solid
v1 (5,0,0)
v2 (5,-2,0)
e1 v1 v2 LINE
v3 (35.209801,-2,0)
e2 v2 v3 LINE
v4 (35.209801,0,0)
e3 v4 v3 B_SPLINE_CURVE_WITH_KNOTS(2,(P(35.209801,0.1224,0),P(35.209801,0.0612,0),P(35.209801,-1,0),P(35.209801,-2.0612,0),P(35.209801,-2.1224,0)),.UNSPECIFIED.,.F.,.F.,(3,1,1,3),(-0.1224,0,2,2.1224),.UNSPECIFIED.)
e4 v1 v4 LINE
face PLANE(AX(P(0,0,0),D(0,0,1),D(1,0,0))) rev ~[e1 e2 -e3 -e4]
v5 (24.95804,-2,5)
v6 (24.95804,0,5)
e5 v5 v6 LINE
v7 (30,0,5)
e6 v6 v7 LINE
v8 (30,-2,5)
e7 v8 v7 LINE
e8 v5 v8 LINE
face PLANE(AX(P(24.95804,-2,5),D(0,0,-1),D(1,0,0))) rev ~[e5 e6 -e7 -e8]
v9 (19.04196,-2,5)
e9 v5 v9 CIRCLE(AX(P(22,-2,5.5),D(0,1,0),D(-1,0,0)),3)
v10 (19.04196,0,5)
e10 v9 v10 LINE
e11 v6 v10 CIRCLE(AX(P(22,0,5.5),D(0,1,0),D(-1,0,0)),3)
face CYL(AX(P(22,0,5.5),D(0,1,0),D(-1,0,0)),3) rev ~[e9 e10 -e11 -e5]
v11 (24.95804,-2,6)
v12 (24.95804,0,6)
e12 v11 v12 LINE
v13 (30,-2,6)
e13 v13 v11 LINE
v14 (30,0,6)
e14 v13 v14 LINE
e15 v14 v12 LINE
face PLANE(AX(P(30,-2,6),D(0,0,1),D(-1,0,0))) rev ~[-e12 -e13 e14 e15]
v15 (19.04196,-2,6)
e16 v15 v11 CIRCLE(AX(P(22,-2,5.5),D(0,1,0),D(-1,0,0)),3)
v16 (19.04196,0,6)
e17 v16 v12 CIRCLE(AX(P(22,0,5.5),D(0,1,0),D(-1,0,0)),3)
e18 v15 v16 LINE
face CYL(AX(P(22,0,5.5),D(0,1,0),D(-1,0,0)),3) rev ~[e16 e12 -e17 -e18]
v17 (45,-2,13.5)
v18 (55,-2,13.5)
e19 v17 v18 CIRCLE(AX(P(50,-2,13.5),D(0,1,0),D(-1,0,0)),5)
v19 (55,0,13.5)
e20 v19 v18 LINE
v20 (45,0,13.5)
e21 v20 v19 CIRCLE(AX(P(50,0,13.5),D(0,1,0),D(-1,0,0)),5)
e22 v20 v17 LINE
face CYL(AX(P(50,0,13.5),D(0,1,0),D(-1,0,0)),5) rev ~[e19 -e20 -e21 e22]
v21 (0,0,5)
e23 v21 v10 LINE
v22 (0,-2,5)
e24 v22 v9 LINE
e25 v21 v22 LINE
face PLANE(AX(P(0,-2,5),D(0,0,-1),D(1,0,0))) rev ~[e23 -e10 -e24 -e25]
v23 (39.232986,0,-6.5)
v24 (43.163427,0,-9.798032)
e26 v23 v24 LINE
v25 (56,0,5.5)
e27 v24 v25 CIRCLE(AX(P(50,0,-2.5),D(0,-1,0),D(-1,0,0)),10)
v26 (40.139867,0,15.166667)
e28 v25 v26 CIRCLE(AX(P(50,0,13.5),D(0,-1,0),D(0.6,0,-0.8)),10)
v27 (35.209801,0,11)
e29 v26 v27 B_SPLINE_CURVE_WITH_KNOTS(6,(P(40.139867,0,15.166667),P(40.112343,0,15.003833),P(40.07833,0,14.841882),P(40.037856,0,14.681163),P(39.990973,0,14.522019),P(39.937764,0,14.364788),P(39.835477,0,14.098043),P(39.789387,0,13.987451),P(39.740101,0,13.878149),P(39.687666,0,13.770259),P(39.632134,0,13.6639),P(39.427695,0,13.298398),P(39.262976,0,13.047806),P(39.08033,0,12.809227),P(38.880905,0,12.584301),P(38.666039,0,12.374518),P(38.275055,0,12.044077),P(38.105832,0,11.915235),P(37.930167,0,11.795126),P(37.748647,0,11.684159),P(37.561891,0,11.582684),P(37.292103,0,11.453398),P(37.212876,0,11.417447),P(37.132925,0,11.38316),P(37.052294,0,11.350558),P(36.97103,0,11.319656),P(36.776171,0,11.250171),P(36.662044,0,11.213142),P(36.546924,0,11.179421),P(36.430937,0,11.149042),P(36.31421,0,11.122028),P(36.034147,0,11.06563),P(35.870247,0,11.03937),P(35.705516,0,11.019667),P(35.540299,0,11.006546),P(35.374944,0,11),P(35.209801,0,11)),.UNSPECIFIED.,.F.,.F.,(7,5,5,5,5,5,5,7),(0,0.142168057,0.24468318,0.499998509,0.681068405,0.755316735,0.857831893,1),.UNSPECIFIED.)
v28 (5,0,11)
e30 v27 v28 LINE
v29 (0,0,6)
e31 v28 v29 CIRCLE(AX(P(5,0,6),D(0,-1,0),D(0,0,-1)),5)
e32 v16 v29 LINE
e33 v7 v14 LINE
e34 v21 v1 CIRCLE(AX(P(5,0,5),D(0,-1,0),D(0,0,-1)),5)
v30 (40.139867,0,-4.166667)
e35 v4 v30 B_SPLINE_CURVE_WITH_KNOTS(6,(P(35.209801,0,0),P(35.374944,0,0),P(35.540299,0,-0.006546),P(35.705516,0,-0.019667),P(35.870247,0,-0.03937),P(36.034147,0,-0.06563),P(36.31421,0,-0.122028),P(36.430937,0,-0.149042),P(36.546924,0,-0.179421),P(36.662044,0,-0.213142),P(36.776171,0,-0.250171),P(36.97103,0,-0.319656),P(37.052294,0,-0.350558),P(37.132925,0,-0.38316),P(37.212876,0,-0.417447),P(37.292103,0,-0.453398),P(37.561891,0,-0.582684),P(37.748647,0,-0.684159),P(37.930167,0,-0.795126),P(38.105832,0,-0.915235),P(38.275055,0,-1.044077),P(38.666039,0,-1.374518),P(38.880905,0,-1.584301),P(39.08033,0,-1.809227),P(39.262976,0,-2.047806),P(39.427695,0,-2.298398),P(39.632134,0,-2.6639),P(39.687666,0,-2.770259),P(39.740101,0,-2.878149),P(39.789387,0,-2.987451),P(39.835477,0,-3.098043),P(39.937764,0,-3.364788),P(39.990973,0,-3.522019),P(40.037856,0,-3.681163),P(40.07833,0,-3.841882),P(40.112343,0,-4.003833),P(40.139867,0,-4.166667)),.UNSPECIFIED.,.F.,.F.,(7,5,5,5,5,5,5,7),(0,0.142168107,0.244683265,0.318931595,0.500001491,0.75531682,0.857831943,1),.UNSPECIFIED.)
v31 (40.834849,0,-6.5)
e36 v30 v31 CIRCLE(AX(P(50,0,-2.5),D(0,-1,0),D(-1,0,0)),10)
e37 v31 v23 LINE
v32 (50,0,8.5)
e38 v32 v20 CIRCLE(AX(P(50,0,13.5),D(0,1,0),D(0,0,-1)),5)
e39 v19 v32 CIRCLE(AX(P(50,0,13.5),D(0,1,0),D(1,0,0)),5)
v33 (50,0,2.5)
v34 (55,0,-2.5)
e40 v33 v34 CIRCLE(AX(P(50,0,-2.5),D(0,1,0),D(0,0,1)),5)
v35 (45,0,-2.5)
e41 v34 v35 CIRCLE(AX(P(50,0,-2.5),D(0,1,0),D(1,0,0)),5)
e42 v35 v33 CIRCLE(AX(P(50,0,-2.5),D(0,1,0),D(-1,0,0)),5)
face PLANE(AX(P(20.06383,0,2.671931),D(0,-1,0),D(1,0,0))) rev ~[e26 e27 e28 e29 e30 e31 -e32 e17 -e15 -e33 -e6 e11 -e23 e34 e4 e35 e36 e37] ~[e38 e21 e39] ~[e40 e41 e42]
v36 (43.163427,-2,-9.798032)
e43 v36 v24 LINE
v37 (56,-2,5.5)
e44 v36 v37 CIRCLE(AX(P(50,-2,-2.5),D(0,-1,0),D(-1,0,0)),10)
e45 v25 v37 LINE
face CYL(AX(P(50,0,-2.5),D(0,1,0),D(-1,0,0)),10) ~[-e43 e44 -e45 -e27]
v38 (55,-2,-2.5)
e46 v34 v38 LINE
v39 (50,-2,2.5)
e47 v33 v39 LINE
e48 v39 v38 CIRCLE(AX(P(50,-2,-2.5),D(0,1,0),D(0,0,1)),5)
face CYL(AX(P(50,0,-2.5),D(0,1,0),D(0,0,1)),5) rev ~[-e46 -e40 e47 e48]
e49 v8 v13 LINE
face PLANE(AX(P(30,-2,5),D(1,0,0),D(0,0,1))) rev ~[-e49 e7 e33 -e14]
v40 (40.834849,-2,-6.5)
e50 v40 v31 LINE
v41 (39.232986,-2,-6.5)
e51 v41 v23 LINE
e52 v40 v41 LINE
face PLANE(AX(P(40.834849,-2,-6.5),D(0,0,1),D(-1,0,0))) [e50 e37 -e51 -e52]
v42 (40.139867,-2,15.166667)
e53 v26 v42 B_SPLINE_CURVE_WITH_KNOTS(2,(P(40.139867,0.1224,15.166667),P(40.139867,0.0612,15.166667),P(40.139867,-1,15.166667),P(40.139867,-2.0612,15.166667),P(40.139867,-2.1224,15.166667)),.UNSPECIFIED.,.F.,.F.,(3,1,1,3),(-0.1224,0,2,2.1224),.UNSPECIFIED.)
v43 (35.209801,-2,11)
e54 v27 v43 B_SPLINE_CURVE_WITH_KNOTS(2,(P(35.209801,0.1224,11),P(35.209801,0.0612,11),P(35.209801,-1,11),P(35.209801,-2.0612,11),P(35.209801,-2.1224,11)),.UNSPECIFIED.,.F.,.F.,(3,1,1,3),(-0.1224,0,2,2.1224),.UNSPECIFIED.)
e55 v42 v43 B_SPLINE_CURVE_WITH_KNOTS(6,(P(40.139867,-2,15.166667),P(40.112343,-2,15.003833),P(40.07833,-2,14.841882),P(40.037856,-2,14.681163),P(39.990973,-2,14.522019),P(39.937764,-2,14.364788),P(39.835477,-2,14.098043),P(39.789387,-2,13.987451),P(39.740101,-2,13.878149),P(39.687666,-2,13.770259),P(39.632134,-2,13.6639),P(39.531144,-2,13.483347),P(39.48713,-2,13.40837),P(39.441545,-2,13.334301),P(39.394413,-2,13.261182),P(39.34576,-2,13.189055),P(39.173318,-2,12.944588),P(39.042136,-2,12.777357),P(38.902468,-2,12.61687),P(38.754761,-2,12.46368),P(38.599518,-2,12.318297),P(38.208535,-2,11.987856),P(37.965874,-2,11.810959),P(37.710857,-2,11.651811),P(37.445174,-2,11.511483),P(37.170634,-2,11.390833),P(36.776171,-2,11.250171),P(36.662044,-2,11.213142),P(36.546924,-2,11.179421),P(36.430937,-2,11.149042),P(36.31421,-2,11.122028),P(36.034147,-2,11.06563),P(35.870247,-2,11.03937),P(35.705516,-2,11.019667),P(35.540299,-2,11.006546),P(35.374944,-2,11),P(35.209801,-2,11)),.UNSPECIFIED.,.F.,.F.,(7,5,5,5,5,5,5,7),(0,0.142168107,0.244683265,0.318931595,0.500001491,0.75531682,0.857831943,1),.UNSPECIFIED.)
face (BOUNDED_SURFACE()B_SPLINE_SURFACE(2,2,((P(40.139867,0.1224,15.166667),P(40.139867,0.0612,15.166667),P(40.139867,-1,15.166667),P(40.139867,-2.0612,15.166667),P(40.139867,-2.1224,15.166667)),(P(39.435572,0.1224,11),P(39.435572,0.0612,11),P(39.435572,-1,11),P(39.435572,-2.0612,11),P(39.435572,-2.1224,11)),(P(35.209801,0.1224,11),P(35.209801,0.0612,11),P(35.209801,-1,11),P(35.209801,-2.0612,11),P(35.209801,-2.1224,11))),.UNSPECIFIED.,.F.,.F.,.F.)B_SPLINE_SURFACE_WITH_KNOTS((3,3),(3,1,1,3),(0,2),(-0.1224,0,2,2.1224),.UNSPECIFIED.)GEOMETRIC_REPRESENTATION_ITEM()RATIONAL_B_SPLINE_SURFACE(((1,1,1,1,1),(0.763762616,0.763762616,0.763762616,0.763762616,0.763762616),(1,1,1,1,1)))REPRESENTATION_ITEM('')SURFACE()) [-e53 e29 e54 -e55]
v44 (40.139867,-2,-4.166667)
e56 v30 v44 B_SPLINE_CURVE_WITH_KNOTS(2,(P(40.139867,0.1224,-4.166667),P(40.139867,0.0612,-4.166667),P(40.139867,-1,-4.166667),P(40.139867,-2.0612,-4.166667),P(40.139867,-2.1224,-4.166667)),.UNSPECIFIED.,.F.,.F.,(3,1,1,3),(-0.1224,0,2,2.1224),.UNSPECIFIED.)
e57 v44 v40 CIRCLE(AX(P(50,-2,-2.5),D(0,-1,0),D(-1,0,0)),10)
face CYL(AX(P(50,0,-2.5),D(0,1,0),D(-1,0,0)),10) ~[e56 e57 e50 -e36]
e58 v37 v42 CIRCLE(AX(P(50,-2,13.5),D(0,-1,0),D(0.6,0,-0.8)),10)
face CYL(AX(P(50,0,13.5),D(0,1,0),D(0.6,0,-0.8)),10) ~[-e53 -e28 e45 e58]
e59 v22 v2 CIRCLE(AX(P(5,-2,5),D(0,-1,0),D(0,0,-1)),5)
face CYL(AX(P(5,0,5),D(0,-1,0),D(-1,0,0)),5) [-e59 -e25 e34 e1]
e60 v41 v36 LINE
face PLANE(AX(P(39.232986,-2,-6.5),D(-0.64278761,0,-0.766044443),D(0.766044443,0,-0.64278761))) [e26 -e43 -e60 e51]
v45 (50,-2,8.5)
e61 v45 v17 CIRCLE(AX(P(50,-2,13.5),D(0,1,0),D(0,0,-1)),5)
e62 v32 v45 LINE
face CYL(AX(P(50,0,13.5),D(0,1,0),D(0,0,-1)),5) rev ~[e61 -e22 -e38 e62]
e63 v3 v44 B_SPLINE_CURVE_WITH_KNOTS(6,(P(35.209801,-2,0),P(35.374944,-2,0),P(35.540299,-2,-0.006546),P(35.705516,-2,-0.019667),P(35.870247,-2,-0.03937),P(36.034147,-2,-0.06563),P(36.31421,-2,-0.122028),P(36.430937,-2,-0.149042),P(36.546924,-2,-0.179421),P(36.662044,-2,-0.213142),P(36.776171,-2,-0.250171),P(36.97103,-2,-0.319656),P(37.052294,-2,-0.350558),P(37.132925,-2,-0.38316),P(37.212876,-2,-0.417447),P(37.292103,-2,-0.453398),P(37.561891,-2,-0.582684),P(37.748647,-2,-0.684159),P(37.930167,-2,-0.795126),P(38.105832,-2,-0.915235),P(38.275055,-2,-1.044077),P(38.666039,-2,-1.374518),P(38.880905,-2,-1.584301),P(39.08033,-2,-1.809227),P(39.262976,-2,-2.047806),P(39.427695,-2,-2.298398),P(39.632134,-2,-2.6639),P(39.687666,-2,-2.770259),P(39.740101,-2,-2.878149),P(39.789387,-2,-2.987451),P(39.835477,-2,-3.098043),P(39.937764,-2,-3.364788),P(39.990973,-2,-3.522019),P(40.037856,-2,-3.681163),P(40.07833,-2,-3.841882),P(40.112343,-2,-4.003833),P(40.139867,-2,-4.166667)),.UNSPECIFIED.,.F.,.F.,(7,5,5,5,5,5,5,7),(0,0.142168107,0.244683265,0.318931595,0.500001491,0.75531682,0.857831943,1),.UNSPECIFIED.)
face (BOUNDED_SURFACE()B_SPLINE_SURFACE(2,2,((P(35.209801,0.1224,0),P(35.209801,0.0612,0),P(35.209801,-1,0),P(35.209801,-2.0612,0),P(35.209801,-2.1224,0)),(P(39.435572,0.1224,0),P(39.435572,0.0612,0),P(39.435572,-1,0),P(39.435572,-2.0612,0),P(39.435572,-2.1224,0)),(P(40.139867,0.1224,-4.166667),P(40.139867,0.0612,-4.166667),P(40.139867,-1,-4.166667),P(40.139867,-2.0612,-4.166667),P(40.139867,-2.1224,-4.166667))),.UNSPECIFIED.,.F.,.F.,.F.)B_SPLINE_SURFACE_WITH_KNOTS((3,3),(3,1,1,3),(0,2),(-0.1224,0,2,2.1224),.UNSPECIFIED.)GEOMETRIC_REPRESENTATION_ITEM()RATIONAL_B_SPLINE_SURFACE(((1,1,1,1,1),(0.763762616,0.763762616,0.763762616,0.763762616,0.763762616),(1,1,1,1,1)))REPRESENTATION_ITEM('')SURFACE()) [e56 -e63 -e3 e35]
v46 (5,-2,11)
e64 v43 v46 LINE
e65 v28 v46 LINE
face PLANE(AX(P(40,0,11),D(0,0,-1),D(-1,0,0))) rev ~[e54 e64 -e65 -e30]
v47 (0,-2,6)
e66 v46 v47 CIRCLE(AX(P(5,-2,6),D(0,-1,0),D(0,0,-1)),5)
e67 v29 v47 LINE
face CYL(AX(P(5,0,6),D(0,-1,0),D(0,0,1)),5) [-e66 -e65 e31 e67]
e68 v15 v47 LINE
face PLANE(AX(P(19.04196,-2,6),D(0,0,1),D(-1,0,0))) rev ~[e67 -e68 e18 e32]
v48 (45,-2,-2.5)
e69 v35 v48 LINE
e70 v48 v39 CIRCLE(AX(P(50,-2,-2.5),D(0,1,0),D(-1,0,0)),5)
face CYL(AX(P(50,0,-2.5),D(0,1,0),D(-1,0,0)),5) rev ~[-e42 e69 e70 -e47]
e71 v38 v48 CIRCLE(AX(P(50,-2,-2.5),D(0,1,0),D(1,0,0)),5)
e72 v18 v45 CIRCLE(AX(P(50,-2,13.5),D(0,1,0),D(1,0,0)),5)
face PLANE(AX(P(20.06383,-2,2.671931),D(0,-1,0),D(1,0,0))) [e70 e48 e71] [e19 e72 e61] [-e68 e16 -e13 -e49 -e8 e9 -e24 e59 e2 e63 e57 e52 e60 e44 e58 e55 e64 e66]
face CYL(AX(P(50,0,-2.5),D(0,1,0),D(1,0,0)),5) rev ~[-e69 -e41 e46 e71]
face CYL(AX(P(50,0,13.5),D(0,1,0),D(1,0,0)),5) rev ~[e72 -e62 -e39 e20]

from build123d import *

# Parameters (mm, degrees)
F1_DEPTH = 2
F2_R     = 5
F4_DEPTH = 2
F6_DEPTH = 2


# Not quite as in the source:
# - a feature names something its author has since deleted; it is built from what else it names


with BuildPart() as f1:
    # F0 (on Front) → F1 (new body)
    with BuildSketch(Plane.XZ):
        with BuildLine():
            Line((0, 5.5), (0, 0))
            Line((0, 0), (40, 0))
            Line((40, 0), (40, 5.5))
            Line((40, 5.5), (25, 5.5))
            ThreePointArc((25, 5.5), (22, 2.5), (19, 5.5))
            Line((19, 5.5), (0, 5.5))
        make_face()
        with BuildLine():
            Line((40, 5.5), (40, 0))
            Line((40, 0), (40, -2.5))
            ThreePointArc((40, -2.5), (41.05572809, 1.972135955), (44, 5.5))
            Line((44, 5.5), (40, 5.5))
        make_face()
        with BuildLine():
            Line((0, 11), (0, 5.5))
            Line((0, 5.5), (19, 5.5))
            ThreePointArc((19, 5.5), (22, 8.5), (25, 5.5))
            Line((25, 5.5), (40, 5.5))
            Line((40, 5.5), (40, 11))
            Line((40, 11), (0, 11))
        make_face()
        with BuildLine():
            Line((40, 11), (40, 5.5))
            Line((40, 5.5), (44, 5.5))
            ThreePointArc((44, 5.5), (41.05572809, 9.027864045), (40, 13.5))
            Line((40, 13.5), (40, 11))
        make_face()
        with BuildLine():
            Line((45, -2.5), (40, -2.5))
            ThreePointArc((40, -2.5), (50, -12.5), (60, -2.5))
            ThreePointArc((60, -2.5), (58.94427191, 1.972135955), (56, 5.5))
            ThreePointArc((56, 5.5), (53.1622776602, 4.0131670195), (50, 3.5))
            Line((50, 3.5), (50, 2.5))
            ThreePointArc((50, 2.5), (53.5355339059, 1.0355339059), (55, -2.5))
            ThreePointArc((55, -2.5), (50, -7.5), (45, -2.5))
        make_face()
        with BuildLine():
            ThreePointArc((44, 5.5), (41.05572809, 1.972135955), (40, -2.5))
            Line((40, -2.5), (45, -2.5))
            ThreePointArc((45, -2.5), (46.4644660941, 1.0355339059), (50, 2.5))
            Line((50, 2.5), (50, 3.5))
            ThreePointArc((50, 3.5), (46.8377223398, 4.0131670195), (44, 5.5))
        make_face()
        with BuildLine():
            ThreePointArc((40, 13.5), (41.05572809, 9.027864045), (44, 5.5))
            ThreePointArc((44, 5.5), (46.8377223398, 6.9868329805), (50, 7.5))
            Line((50, 7.5), (50, 8.5))
            ThreePointArc((50, 8.5), (46.4644660941, 9.9644660941), (45, 13.5))
            Line((45, 13.5), (40, 13.5))
        make_face()
        with BuildLine():
            Line((50, 5.5), (44, 5.5))
            ThreePointArc((44, 5.5), (46.8377223398, 4.0131670195), (50, 3.5))
            Line((50, 3.5), (50, 5.5))
        make_face()
        with BuildLine():
            ThreePointArc((50, 7.5), (46.8377223398, 6.9868329805), (44, 5.5))
            Line((44, 5.5), (50, 5.5))
            Line((50, 5.5), (50, 7.5))
        make_face()
        with BuildLine():
            ThreePointArc((60, 13.5), (50, 23.5), (40, 13.5))
            Line((40, 13.5), (45, 13.5))
            ThreePointArc((45, 13.5), (50, 18.5), (55, 13.5))
            ThreePointArc((55, 13.5), (53.5355339059, 9.9644660941), (50, 8.5))
            Line((50, 8.5), (50, 7.5))
            ThreePointArc((50, 7.5), (53.1622776602, 6.9868329805), (56, 5.5))
            ThreePointArc((56, 5.5), (58.94427191, 9.027864045), (60, 13.5))
        make_face()
        with BuildLine():
            ThreePointArc((56, 5.5), (53.1622776602, 6.9868329805), (50, 7.5))
            Line((50, 7.5), (50, 5.5))
            Line((50, 5.5), (56, 5.5))
        make_face()
        with BuildLine():
            Line((50, 5.5), (50, 3.5))
            ThreePointArc((50, 3.5), (53.1622776602, 4.0131670195), (56, 5.5))
            Line((56, 5.5), (50, 5.5))
        make_face()
    extrude(amount=F1_DEPTH)

    # F2
    f2_edges = [f1.edges().sort_by_distance(p)[0] for p in [
        (40, -1, 11),
        (40, -1, 0),
        (0, -1, 11),
        (0, -1, 0),
    ]]
    fillet(f2_edges, radius=F2_R)

    # F3 (on face) → F4 (cut, through all)
    with BuildSketch(Plane.XZ.offset(2)):
        with BuildLine():
            Line((19.0419601085, 6), (0, 6))
            Line((0, 6), (0, 5))
            Line((0, 5), (19.0419601085, 5))
            ThreePointArc((19.0419601085, 5), (19, 5.5), (19.0419601085, 6))
        make_face()
        with BuildLine():
            Line((30, 6), (24.9580398915, 6))
            ThreePointArc((24.9580398915, 6), (24.9894915684, 5.7508787808), (25, 5.5))
            ThreePointArc((25, 5.5), (24.9894915684, 5.2491212192), (24.9580398915, 5))
            Line((24.9580398915, 5), (30, 5))
            Line((30, 5), (30, 6))
        make_face()
    extrude(amount=-F4_DEPTH, mode=Mode.SUBTRACT)

    # F5 (on face) → F6 (join)
    with BuildSketch(Plane.XZ.offset(2)):
        with BuildLine():
            ThreePointArc((43.1634270419, -9.7980319394), (41.8309701191, -8.2677509312), (40.8348486101, -6.5))
            Line((40.8348486101, -6.5), (39.2329856296, -6.5))
            Line((39.2329856296, -6.5), (43.1634270419, -9.7980319394))
        make_face()
    extrude(amount=-F6_DEPTH)


solid = f1.part
